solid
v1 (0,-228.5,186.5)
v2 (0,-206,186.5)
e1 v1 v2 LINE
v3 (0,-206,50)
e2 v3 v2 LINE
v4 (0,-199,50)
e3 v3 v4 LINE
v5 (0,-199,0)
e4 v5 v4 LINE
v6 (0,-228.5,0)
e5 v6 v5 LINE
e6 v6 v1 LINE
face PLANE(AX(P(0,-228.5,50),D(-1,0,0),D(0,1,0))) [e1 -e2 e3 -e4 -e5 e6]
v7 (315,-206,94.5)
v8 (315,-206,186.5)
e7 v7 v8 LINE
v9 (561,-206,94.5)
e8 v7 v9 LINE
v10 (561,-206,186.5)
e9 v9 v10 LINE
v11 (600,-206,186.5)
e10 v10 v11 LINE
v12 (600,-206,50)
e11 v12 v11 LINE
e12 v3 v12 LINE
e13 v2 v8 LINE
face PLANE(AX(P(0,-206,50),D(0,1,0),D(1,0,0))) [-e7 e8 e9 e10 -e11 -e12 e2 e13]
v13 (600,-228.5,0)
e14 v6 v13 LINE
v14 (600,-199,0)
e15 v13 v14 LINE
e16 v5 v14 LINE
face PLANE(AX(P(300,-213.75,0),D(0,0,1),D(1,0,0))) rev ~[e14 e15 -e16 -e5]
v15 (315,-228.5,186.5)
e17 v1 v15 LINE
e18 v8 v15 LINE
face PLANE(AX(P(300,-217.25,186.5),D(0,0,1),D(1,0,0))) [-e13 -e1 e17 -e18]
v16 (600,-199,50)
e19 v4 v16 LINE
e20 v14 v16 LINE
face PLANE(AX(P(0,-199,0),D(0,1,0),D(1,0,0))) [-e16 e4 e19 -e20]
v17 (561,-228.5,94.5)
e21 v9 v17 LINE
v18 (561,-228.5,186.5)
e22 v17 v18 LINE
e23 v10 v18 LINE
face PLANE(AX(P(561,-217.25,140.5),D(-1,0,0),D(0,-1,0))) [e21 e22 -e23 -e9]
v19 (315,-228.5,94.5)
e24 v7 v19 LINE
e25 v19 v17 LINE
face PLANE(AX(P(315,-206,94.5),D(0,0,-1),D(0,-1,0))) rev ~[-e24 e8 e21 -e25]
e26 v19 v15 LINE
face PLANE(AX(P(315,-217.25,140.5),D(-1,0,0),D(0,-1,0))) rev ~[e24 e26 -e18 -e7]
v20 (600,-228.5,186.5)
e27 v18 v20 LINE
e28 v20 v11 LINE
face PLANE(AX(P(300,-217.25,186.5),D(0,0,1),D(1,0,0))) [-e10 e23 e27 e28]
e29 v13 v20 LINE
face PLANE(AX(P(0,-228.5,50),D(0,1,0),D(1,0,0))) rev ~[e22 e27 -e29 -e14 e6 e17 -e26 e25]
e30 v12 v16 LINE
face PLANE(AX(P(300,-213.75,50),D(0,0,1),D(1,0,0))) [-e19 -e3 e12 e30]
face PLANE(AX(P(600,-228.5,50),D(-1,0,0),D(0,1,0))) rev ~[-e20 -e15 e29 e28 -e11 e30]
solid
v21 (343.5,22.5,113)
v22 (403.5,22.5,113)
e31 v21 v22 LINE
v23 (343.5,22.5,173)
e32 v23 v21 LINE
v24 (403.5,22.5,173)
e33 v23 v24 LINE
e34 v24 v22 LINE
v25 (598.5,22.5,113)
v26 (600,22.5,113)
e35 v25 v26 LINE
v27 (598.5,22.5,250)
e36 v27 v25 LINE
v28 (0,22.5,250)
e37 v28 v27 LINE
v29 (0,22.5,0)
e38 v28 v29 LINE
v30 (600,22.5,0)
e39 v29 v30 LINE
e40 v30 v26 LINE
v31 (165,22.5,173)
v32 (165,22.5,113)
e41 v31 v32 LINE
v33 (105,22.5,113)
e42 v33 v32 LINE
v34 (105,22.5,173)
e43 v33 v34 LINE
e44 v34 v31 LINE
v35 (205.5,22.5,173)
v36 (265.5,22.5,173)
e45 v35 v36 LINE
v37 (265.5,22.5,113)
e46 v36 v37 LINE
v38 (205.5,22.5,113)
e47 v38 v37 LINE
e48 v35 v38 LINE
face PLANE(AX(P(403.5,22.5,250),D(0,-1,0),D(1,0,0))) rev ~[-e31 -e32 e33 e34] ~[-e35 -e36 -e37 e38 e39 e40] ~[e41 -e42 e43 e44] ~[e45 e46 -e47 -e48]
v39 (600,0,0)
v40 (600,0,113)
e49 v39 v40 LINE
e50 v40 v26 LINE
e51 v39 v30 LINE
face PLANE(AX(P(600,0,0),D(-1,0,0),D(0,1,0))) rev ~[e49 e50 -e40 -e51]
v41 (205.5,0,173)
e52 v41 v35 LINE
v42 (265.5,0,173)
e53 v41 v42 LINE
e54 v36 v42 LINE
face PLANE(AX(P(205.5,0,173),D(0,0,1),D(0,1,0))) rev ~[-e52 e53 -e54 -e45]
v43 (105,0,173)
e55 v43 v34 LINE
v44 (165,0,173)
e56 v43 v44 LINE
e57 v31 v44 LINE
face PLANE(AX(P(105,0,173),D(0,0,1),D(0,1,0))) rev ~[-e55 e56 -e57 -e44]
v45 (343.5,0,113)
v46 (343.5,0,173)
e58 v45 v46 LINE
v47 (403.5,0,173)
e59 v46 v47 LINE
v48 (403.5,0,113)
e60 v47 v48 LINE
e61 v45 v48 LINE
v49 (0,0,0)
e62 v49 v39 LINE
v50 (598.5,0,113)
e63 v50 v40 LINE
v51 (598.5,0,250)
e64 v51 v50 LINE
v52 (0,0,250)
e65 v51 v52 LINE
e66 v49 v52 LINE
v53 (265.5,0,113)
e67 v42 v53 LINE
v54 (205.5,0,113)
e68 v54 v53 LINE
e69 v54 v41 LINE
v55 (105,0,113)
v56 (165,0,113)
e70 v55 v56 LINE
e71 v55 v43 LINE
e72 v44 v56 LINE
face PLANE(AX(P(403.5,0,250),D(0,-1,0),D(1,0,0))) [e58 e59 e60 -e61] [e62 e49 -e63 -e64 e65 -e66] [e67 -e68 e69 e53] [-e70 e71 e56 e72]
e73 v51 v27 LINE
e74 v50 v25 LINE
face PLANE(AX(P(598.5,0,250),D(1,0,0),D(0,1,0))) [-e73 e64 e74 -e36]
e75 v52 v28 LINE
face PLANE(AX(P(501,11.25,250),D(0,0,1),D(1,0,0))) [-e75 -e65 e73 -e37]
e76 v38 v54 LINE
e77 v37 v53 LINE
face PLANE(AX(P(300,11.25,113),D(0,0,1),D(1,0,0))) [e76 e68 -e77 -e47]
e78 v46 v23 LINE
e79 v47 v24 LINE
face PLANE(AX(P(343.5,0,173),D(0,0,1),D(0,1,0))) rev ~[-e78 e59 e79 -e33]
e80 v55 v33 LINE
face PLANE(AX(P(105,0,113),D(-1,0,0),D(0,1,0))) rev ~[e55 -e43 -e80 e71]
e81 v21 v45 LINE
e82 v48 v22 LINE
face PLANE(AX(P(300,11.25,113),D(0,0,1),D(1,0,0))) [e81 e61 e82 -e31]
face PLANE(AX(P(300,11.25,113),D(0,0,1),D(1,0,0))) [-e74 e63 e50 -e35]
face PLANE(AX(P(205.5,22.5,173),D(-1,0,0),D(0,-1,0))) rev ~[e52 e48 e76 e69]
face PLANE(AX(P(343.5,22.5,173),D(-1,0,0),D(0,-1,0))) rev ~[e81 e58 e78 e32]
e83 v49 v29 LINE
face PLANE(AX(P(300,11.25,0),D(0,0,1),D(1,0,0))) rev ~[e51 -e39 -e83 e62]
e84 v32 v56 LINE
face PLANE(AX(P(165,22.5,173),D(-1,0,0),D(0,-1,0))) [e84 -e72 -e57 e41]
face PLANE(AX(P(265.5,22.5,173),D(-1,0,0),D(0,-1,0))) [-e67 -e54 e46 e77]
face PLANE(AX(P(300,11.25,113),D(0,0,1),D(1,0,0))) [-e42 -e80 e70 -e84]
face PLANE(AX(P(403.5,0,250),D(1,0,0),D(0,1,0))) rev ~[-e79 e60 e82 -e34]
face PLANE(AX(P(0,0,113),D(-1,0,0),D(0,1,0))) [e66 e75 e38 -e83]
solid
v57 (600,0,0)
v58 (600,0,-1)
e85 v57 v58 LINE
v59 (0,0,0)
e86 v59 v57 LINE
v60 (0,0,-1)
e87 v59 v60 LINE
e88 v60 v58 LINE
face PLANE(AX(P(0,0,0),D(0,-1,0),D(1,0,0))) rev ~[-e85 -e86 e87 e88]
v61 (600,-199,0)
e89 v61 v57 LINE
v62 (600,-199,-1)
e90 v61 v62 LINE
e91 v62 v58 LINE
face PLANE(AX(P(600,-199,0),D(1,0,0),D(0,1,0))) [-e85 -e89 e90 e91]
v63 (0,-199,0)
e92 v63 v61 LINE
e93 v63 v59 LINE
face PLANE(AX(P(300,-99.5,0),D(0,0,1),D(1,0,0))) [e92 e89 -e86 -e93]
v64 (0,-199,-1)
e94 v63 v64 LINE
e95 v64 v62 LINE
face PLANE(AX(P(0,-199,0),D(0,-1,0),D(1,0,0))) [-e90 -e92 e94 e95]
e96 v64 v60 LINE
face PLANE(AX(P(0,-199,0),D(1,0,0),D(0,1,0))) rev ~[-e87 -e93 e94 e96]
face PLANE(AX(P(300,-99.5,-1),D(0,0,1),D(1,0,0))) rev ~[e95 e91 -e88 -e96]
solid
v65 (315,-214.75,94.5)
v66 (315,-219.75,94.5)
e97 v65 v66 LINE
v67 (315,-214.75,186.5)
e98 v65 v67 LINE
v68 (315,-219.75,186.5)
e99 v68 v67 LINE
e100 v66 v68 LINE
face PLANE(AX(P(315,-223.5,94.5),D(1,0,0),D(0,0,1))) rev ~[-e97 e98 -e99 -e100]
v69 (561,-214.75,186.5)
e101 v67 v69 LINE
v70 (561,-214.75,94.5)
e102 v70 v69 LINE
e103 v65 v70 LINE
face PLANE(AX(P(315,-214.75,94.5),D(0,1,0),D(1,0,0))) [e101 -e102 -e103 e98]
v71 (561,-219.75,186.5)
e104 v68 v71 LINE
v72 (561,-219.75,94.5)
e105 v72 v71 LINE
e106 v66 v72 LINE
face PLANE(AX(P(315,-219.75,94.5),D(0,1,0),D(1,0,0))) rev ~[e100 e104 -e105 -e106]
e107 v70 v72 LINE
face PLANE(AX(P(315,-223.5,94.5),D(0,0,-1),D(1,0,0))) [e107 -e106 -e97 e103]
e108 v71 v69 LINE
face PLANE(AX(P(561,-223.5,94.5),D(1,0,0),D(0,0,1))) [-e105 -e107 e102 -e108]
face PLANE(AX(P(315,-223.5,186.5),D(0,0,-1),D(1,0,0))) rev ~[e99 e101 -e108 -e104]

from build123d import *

# Parameters (mm, degrees)
F1_W      = 600
F1_H      = 22.5
F2_DEPTH  = 113
F3_W      = 105
F3_H      = 22.5
F4_DEPTH  = 137
F5_W      = 22.5
F5_H      = 77
F6_DEPTH  = 100.5
F7_W      = 40.5
F7_H      = 22.5
F8_DEPTH  = 61
F9_W      = 22.5
F9_H      = 77
F10_DEPTH = 138
F11_W     = 78
F11_H     = 22.5
F12_DEPTH = 61
F13_W     = 22.5
F13_H     = 77
F14_DEPTH = 60
F15_W     = 195
F15_H     = 22.5
F16_DEPTH = 140
F0_W      = 600
F0_H      = 199
F17_DEPTH = 1
F18_W     = 600
F18_H     = 29.5
F19_DEPTH = 50
F20_W     = 600
F20_H     = 22.5
F21_DEPTH = 136.5
F23_START = -315
F22_W     = 22.5
F22_H     = 92
F23_DEPTH = 246
F24_W     = 246
F24_H     = 5
F25_DEPTH = 92
F26_DEPTH = 8.75
F27_DEPTH = 8.75


with BuildPart() as f2:
    # F1 (on face) → F2 (new body)
    with BuildSketch(Plane.XY):
        with Locations((300, 11.25)):
            Rectangle(F1_W, F1_H)
    extrude(amount=F2_DEPTH)

    # F3 (on face) → F4 (join)
    with BuildSketch(Plane.XY.offset(113)):
        with Locations((52.5, 11.25)):
            Rectangle(F3_W, F3_H)
    extrude(amount=F4_DEPTH)

    # F5 (on face) → F6 (join)
    with BuildSketch(Plane.YZ.offset(105)):
        with Locations((11.25, 211.5)):
            Rectangle(F5_W, F5_H)
    extrude(amount=F6_DEPTH)

    # F7 (on face) → F8 (join)
    with BuildSketch(Plane(origin=(0, 0, 173), x_dir=(1, 0, 0), z_dir=(0, 0, -1))):
        with Locations((185.25, -11.25)):
            Rectangle(F7_W, F7_H)
    extrude(amount=F8_DEPTH)

    # F9 (on face) → F10 (join)
    with BuildSketch(Plane.YZ.offset(205.5)):
        with Locations((11.25, 211.5)):
            Rectangle(F9_W, F9_H)
    extrude(amount=F10_DEPTH)

    # F11 (on face) → F12 (join)
    with BuildSketch(Plane(origin=(0, 0, 173), x_dir=(1, 0, 0), z_dir=(0, 0, -1))):
        with Locations((304.5, -11.25)):
            Rectangle(F11_W, F11_H)
    extrude(amount=F12_DEPTH)

    # F13 (on face) → F14 (join)
    with BuildSketch(Plane.YZ.offset(343.5)):
        with Locations((11.25, 211.5)):
            Rectangle(F13_W, F13_H)
    extrude(amount=F14_DEPTH)

    # F15 (on face) → F16 (join)
    with BuildSketch(Plane.XY.offset(250)):
        with Locations((501, 11.25)):
            Rectangle(F15_W, F15_H)
    extrude(amount=-F16_DEPTH)


with BuildPart() as f17:
    # F0 (on Top) → F17 (new body)
    with BuildSketch(Plane.XY):
        with Locations((300, -99.5)):
            Rectangle(F0_W, F0_H)
    extrude(amount=-F17_DEPTH)


with BuildPart() as f19:
    # F18 (on face) → F19 (new body)
    with BuildSketch(Plane.XY):
        with Locations((300, -213.75)):
            Rectangle(F18_W, F18_H)
    extrude(amount=F19_DEPTH)

    # F20 (on face) → F21 (join)
    with BuildSketch(Plane.XY.offset(50)):
        with Locations((300, -217.25)):
            Rectangle(F20_W, F20_H)
    extrude(amount=F21_DEPTH)

    # F22 (on face) → F23 (cut)
    with BuildSketch(Plane(origin=(0, 0, 0), x_dir=(0, -1, 0), z_dir=(-1, 0, 0)).offset(F23_START)):
        with Locations((217.25, 140.5)):
            Rectangle(F22_W, F22_H)
    extrude(amount=-F23_DEPTH, mode=Mode.SUBTRACT)


with BuildPart() as f25:
    # F24 (on face) → F25 (new body)
    with BuildSketch(Plane.XY.offset(94.5)):
        with Locations((438, -226)):
            Rectangle(F24_W, F24_H)
    extrude(amount=F25_DEPTH)

    # F26 (add): a face of the model
    f26_faces = [f25.faces().sort_by_distance(p)[0] for p in [
        (438, -223.5, 140.5),
    ]]
    extrude(f26_faces, amount=F26_DEPTH)

    # F27 (cut): a face of the model
    f27_faces = [f25.faces().sort_by_distance(p)[0] for p in [
        (438, -228.5, 140.5),
    ]]
    extrude(f27_faces, amount=-F27_DEPTH, mode=Mode.SUBTRACT)


solid = Compound([f2.part, f17.part, f19.part, f25.part])
